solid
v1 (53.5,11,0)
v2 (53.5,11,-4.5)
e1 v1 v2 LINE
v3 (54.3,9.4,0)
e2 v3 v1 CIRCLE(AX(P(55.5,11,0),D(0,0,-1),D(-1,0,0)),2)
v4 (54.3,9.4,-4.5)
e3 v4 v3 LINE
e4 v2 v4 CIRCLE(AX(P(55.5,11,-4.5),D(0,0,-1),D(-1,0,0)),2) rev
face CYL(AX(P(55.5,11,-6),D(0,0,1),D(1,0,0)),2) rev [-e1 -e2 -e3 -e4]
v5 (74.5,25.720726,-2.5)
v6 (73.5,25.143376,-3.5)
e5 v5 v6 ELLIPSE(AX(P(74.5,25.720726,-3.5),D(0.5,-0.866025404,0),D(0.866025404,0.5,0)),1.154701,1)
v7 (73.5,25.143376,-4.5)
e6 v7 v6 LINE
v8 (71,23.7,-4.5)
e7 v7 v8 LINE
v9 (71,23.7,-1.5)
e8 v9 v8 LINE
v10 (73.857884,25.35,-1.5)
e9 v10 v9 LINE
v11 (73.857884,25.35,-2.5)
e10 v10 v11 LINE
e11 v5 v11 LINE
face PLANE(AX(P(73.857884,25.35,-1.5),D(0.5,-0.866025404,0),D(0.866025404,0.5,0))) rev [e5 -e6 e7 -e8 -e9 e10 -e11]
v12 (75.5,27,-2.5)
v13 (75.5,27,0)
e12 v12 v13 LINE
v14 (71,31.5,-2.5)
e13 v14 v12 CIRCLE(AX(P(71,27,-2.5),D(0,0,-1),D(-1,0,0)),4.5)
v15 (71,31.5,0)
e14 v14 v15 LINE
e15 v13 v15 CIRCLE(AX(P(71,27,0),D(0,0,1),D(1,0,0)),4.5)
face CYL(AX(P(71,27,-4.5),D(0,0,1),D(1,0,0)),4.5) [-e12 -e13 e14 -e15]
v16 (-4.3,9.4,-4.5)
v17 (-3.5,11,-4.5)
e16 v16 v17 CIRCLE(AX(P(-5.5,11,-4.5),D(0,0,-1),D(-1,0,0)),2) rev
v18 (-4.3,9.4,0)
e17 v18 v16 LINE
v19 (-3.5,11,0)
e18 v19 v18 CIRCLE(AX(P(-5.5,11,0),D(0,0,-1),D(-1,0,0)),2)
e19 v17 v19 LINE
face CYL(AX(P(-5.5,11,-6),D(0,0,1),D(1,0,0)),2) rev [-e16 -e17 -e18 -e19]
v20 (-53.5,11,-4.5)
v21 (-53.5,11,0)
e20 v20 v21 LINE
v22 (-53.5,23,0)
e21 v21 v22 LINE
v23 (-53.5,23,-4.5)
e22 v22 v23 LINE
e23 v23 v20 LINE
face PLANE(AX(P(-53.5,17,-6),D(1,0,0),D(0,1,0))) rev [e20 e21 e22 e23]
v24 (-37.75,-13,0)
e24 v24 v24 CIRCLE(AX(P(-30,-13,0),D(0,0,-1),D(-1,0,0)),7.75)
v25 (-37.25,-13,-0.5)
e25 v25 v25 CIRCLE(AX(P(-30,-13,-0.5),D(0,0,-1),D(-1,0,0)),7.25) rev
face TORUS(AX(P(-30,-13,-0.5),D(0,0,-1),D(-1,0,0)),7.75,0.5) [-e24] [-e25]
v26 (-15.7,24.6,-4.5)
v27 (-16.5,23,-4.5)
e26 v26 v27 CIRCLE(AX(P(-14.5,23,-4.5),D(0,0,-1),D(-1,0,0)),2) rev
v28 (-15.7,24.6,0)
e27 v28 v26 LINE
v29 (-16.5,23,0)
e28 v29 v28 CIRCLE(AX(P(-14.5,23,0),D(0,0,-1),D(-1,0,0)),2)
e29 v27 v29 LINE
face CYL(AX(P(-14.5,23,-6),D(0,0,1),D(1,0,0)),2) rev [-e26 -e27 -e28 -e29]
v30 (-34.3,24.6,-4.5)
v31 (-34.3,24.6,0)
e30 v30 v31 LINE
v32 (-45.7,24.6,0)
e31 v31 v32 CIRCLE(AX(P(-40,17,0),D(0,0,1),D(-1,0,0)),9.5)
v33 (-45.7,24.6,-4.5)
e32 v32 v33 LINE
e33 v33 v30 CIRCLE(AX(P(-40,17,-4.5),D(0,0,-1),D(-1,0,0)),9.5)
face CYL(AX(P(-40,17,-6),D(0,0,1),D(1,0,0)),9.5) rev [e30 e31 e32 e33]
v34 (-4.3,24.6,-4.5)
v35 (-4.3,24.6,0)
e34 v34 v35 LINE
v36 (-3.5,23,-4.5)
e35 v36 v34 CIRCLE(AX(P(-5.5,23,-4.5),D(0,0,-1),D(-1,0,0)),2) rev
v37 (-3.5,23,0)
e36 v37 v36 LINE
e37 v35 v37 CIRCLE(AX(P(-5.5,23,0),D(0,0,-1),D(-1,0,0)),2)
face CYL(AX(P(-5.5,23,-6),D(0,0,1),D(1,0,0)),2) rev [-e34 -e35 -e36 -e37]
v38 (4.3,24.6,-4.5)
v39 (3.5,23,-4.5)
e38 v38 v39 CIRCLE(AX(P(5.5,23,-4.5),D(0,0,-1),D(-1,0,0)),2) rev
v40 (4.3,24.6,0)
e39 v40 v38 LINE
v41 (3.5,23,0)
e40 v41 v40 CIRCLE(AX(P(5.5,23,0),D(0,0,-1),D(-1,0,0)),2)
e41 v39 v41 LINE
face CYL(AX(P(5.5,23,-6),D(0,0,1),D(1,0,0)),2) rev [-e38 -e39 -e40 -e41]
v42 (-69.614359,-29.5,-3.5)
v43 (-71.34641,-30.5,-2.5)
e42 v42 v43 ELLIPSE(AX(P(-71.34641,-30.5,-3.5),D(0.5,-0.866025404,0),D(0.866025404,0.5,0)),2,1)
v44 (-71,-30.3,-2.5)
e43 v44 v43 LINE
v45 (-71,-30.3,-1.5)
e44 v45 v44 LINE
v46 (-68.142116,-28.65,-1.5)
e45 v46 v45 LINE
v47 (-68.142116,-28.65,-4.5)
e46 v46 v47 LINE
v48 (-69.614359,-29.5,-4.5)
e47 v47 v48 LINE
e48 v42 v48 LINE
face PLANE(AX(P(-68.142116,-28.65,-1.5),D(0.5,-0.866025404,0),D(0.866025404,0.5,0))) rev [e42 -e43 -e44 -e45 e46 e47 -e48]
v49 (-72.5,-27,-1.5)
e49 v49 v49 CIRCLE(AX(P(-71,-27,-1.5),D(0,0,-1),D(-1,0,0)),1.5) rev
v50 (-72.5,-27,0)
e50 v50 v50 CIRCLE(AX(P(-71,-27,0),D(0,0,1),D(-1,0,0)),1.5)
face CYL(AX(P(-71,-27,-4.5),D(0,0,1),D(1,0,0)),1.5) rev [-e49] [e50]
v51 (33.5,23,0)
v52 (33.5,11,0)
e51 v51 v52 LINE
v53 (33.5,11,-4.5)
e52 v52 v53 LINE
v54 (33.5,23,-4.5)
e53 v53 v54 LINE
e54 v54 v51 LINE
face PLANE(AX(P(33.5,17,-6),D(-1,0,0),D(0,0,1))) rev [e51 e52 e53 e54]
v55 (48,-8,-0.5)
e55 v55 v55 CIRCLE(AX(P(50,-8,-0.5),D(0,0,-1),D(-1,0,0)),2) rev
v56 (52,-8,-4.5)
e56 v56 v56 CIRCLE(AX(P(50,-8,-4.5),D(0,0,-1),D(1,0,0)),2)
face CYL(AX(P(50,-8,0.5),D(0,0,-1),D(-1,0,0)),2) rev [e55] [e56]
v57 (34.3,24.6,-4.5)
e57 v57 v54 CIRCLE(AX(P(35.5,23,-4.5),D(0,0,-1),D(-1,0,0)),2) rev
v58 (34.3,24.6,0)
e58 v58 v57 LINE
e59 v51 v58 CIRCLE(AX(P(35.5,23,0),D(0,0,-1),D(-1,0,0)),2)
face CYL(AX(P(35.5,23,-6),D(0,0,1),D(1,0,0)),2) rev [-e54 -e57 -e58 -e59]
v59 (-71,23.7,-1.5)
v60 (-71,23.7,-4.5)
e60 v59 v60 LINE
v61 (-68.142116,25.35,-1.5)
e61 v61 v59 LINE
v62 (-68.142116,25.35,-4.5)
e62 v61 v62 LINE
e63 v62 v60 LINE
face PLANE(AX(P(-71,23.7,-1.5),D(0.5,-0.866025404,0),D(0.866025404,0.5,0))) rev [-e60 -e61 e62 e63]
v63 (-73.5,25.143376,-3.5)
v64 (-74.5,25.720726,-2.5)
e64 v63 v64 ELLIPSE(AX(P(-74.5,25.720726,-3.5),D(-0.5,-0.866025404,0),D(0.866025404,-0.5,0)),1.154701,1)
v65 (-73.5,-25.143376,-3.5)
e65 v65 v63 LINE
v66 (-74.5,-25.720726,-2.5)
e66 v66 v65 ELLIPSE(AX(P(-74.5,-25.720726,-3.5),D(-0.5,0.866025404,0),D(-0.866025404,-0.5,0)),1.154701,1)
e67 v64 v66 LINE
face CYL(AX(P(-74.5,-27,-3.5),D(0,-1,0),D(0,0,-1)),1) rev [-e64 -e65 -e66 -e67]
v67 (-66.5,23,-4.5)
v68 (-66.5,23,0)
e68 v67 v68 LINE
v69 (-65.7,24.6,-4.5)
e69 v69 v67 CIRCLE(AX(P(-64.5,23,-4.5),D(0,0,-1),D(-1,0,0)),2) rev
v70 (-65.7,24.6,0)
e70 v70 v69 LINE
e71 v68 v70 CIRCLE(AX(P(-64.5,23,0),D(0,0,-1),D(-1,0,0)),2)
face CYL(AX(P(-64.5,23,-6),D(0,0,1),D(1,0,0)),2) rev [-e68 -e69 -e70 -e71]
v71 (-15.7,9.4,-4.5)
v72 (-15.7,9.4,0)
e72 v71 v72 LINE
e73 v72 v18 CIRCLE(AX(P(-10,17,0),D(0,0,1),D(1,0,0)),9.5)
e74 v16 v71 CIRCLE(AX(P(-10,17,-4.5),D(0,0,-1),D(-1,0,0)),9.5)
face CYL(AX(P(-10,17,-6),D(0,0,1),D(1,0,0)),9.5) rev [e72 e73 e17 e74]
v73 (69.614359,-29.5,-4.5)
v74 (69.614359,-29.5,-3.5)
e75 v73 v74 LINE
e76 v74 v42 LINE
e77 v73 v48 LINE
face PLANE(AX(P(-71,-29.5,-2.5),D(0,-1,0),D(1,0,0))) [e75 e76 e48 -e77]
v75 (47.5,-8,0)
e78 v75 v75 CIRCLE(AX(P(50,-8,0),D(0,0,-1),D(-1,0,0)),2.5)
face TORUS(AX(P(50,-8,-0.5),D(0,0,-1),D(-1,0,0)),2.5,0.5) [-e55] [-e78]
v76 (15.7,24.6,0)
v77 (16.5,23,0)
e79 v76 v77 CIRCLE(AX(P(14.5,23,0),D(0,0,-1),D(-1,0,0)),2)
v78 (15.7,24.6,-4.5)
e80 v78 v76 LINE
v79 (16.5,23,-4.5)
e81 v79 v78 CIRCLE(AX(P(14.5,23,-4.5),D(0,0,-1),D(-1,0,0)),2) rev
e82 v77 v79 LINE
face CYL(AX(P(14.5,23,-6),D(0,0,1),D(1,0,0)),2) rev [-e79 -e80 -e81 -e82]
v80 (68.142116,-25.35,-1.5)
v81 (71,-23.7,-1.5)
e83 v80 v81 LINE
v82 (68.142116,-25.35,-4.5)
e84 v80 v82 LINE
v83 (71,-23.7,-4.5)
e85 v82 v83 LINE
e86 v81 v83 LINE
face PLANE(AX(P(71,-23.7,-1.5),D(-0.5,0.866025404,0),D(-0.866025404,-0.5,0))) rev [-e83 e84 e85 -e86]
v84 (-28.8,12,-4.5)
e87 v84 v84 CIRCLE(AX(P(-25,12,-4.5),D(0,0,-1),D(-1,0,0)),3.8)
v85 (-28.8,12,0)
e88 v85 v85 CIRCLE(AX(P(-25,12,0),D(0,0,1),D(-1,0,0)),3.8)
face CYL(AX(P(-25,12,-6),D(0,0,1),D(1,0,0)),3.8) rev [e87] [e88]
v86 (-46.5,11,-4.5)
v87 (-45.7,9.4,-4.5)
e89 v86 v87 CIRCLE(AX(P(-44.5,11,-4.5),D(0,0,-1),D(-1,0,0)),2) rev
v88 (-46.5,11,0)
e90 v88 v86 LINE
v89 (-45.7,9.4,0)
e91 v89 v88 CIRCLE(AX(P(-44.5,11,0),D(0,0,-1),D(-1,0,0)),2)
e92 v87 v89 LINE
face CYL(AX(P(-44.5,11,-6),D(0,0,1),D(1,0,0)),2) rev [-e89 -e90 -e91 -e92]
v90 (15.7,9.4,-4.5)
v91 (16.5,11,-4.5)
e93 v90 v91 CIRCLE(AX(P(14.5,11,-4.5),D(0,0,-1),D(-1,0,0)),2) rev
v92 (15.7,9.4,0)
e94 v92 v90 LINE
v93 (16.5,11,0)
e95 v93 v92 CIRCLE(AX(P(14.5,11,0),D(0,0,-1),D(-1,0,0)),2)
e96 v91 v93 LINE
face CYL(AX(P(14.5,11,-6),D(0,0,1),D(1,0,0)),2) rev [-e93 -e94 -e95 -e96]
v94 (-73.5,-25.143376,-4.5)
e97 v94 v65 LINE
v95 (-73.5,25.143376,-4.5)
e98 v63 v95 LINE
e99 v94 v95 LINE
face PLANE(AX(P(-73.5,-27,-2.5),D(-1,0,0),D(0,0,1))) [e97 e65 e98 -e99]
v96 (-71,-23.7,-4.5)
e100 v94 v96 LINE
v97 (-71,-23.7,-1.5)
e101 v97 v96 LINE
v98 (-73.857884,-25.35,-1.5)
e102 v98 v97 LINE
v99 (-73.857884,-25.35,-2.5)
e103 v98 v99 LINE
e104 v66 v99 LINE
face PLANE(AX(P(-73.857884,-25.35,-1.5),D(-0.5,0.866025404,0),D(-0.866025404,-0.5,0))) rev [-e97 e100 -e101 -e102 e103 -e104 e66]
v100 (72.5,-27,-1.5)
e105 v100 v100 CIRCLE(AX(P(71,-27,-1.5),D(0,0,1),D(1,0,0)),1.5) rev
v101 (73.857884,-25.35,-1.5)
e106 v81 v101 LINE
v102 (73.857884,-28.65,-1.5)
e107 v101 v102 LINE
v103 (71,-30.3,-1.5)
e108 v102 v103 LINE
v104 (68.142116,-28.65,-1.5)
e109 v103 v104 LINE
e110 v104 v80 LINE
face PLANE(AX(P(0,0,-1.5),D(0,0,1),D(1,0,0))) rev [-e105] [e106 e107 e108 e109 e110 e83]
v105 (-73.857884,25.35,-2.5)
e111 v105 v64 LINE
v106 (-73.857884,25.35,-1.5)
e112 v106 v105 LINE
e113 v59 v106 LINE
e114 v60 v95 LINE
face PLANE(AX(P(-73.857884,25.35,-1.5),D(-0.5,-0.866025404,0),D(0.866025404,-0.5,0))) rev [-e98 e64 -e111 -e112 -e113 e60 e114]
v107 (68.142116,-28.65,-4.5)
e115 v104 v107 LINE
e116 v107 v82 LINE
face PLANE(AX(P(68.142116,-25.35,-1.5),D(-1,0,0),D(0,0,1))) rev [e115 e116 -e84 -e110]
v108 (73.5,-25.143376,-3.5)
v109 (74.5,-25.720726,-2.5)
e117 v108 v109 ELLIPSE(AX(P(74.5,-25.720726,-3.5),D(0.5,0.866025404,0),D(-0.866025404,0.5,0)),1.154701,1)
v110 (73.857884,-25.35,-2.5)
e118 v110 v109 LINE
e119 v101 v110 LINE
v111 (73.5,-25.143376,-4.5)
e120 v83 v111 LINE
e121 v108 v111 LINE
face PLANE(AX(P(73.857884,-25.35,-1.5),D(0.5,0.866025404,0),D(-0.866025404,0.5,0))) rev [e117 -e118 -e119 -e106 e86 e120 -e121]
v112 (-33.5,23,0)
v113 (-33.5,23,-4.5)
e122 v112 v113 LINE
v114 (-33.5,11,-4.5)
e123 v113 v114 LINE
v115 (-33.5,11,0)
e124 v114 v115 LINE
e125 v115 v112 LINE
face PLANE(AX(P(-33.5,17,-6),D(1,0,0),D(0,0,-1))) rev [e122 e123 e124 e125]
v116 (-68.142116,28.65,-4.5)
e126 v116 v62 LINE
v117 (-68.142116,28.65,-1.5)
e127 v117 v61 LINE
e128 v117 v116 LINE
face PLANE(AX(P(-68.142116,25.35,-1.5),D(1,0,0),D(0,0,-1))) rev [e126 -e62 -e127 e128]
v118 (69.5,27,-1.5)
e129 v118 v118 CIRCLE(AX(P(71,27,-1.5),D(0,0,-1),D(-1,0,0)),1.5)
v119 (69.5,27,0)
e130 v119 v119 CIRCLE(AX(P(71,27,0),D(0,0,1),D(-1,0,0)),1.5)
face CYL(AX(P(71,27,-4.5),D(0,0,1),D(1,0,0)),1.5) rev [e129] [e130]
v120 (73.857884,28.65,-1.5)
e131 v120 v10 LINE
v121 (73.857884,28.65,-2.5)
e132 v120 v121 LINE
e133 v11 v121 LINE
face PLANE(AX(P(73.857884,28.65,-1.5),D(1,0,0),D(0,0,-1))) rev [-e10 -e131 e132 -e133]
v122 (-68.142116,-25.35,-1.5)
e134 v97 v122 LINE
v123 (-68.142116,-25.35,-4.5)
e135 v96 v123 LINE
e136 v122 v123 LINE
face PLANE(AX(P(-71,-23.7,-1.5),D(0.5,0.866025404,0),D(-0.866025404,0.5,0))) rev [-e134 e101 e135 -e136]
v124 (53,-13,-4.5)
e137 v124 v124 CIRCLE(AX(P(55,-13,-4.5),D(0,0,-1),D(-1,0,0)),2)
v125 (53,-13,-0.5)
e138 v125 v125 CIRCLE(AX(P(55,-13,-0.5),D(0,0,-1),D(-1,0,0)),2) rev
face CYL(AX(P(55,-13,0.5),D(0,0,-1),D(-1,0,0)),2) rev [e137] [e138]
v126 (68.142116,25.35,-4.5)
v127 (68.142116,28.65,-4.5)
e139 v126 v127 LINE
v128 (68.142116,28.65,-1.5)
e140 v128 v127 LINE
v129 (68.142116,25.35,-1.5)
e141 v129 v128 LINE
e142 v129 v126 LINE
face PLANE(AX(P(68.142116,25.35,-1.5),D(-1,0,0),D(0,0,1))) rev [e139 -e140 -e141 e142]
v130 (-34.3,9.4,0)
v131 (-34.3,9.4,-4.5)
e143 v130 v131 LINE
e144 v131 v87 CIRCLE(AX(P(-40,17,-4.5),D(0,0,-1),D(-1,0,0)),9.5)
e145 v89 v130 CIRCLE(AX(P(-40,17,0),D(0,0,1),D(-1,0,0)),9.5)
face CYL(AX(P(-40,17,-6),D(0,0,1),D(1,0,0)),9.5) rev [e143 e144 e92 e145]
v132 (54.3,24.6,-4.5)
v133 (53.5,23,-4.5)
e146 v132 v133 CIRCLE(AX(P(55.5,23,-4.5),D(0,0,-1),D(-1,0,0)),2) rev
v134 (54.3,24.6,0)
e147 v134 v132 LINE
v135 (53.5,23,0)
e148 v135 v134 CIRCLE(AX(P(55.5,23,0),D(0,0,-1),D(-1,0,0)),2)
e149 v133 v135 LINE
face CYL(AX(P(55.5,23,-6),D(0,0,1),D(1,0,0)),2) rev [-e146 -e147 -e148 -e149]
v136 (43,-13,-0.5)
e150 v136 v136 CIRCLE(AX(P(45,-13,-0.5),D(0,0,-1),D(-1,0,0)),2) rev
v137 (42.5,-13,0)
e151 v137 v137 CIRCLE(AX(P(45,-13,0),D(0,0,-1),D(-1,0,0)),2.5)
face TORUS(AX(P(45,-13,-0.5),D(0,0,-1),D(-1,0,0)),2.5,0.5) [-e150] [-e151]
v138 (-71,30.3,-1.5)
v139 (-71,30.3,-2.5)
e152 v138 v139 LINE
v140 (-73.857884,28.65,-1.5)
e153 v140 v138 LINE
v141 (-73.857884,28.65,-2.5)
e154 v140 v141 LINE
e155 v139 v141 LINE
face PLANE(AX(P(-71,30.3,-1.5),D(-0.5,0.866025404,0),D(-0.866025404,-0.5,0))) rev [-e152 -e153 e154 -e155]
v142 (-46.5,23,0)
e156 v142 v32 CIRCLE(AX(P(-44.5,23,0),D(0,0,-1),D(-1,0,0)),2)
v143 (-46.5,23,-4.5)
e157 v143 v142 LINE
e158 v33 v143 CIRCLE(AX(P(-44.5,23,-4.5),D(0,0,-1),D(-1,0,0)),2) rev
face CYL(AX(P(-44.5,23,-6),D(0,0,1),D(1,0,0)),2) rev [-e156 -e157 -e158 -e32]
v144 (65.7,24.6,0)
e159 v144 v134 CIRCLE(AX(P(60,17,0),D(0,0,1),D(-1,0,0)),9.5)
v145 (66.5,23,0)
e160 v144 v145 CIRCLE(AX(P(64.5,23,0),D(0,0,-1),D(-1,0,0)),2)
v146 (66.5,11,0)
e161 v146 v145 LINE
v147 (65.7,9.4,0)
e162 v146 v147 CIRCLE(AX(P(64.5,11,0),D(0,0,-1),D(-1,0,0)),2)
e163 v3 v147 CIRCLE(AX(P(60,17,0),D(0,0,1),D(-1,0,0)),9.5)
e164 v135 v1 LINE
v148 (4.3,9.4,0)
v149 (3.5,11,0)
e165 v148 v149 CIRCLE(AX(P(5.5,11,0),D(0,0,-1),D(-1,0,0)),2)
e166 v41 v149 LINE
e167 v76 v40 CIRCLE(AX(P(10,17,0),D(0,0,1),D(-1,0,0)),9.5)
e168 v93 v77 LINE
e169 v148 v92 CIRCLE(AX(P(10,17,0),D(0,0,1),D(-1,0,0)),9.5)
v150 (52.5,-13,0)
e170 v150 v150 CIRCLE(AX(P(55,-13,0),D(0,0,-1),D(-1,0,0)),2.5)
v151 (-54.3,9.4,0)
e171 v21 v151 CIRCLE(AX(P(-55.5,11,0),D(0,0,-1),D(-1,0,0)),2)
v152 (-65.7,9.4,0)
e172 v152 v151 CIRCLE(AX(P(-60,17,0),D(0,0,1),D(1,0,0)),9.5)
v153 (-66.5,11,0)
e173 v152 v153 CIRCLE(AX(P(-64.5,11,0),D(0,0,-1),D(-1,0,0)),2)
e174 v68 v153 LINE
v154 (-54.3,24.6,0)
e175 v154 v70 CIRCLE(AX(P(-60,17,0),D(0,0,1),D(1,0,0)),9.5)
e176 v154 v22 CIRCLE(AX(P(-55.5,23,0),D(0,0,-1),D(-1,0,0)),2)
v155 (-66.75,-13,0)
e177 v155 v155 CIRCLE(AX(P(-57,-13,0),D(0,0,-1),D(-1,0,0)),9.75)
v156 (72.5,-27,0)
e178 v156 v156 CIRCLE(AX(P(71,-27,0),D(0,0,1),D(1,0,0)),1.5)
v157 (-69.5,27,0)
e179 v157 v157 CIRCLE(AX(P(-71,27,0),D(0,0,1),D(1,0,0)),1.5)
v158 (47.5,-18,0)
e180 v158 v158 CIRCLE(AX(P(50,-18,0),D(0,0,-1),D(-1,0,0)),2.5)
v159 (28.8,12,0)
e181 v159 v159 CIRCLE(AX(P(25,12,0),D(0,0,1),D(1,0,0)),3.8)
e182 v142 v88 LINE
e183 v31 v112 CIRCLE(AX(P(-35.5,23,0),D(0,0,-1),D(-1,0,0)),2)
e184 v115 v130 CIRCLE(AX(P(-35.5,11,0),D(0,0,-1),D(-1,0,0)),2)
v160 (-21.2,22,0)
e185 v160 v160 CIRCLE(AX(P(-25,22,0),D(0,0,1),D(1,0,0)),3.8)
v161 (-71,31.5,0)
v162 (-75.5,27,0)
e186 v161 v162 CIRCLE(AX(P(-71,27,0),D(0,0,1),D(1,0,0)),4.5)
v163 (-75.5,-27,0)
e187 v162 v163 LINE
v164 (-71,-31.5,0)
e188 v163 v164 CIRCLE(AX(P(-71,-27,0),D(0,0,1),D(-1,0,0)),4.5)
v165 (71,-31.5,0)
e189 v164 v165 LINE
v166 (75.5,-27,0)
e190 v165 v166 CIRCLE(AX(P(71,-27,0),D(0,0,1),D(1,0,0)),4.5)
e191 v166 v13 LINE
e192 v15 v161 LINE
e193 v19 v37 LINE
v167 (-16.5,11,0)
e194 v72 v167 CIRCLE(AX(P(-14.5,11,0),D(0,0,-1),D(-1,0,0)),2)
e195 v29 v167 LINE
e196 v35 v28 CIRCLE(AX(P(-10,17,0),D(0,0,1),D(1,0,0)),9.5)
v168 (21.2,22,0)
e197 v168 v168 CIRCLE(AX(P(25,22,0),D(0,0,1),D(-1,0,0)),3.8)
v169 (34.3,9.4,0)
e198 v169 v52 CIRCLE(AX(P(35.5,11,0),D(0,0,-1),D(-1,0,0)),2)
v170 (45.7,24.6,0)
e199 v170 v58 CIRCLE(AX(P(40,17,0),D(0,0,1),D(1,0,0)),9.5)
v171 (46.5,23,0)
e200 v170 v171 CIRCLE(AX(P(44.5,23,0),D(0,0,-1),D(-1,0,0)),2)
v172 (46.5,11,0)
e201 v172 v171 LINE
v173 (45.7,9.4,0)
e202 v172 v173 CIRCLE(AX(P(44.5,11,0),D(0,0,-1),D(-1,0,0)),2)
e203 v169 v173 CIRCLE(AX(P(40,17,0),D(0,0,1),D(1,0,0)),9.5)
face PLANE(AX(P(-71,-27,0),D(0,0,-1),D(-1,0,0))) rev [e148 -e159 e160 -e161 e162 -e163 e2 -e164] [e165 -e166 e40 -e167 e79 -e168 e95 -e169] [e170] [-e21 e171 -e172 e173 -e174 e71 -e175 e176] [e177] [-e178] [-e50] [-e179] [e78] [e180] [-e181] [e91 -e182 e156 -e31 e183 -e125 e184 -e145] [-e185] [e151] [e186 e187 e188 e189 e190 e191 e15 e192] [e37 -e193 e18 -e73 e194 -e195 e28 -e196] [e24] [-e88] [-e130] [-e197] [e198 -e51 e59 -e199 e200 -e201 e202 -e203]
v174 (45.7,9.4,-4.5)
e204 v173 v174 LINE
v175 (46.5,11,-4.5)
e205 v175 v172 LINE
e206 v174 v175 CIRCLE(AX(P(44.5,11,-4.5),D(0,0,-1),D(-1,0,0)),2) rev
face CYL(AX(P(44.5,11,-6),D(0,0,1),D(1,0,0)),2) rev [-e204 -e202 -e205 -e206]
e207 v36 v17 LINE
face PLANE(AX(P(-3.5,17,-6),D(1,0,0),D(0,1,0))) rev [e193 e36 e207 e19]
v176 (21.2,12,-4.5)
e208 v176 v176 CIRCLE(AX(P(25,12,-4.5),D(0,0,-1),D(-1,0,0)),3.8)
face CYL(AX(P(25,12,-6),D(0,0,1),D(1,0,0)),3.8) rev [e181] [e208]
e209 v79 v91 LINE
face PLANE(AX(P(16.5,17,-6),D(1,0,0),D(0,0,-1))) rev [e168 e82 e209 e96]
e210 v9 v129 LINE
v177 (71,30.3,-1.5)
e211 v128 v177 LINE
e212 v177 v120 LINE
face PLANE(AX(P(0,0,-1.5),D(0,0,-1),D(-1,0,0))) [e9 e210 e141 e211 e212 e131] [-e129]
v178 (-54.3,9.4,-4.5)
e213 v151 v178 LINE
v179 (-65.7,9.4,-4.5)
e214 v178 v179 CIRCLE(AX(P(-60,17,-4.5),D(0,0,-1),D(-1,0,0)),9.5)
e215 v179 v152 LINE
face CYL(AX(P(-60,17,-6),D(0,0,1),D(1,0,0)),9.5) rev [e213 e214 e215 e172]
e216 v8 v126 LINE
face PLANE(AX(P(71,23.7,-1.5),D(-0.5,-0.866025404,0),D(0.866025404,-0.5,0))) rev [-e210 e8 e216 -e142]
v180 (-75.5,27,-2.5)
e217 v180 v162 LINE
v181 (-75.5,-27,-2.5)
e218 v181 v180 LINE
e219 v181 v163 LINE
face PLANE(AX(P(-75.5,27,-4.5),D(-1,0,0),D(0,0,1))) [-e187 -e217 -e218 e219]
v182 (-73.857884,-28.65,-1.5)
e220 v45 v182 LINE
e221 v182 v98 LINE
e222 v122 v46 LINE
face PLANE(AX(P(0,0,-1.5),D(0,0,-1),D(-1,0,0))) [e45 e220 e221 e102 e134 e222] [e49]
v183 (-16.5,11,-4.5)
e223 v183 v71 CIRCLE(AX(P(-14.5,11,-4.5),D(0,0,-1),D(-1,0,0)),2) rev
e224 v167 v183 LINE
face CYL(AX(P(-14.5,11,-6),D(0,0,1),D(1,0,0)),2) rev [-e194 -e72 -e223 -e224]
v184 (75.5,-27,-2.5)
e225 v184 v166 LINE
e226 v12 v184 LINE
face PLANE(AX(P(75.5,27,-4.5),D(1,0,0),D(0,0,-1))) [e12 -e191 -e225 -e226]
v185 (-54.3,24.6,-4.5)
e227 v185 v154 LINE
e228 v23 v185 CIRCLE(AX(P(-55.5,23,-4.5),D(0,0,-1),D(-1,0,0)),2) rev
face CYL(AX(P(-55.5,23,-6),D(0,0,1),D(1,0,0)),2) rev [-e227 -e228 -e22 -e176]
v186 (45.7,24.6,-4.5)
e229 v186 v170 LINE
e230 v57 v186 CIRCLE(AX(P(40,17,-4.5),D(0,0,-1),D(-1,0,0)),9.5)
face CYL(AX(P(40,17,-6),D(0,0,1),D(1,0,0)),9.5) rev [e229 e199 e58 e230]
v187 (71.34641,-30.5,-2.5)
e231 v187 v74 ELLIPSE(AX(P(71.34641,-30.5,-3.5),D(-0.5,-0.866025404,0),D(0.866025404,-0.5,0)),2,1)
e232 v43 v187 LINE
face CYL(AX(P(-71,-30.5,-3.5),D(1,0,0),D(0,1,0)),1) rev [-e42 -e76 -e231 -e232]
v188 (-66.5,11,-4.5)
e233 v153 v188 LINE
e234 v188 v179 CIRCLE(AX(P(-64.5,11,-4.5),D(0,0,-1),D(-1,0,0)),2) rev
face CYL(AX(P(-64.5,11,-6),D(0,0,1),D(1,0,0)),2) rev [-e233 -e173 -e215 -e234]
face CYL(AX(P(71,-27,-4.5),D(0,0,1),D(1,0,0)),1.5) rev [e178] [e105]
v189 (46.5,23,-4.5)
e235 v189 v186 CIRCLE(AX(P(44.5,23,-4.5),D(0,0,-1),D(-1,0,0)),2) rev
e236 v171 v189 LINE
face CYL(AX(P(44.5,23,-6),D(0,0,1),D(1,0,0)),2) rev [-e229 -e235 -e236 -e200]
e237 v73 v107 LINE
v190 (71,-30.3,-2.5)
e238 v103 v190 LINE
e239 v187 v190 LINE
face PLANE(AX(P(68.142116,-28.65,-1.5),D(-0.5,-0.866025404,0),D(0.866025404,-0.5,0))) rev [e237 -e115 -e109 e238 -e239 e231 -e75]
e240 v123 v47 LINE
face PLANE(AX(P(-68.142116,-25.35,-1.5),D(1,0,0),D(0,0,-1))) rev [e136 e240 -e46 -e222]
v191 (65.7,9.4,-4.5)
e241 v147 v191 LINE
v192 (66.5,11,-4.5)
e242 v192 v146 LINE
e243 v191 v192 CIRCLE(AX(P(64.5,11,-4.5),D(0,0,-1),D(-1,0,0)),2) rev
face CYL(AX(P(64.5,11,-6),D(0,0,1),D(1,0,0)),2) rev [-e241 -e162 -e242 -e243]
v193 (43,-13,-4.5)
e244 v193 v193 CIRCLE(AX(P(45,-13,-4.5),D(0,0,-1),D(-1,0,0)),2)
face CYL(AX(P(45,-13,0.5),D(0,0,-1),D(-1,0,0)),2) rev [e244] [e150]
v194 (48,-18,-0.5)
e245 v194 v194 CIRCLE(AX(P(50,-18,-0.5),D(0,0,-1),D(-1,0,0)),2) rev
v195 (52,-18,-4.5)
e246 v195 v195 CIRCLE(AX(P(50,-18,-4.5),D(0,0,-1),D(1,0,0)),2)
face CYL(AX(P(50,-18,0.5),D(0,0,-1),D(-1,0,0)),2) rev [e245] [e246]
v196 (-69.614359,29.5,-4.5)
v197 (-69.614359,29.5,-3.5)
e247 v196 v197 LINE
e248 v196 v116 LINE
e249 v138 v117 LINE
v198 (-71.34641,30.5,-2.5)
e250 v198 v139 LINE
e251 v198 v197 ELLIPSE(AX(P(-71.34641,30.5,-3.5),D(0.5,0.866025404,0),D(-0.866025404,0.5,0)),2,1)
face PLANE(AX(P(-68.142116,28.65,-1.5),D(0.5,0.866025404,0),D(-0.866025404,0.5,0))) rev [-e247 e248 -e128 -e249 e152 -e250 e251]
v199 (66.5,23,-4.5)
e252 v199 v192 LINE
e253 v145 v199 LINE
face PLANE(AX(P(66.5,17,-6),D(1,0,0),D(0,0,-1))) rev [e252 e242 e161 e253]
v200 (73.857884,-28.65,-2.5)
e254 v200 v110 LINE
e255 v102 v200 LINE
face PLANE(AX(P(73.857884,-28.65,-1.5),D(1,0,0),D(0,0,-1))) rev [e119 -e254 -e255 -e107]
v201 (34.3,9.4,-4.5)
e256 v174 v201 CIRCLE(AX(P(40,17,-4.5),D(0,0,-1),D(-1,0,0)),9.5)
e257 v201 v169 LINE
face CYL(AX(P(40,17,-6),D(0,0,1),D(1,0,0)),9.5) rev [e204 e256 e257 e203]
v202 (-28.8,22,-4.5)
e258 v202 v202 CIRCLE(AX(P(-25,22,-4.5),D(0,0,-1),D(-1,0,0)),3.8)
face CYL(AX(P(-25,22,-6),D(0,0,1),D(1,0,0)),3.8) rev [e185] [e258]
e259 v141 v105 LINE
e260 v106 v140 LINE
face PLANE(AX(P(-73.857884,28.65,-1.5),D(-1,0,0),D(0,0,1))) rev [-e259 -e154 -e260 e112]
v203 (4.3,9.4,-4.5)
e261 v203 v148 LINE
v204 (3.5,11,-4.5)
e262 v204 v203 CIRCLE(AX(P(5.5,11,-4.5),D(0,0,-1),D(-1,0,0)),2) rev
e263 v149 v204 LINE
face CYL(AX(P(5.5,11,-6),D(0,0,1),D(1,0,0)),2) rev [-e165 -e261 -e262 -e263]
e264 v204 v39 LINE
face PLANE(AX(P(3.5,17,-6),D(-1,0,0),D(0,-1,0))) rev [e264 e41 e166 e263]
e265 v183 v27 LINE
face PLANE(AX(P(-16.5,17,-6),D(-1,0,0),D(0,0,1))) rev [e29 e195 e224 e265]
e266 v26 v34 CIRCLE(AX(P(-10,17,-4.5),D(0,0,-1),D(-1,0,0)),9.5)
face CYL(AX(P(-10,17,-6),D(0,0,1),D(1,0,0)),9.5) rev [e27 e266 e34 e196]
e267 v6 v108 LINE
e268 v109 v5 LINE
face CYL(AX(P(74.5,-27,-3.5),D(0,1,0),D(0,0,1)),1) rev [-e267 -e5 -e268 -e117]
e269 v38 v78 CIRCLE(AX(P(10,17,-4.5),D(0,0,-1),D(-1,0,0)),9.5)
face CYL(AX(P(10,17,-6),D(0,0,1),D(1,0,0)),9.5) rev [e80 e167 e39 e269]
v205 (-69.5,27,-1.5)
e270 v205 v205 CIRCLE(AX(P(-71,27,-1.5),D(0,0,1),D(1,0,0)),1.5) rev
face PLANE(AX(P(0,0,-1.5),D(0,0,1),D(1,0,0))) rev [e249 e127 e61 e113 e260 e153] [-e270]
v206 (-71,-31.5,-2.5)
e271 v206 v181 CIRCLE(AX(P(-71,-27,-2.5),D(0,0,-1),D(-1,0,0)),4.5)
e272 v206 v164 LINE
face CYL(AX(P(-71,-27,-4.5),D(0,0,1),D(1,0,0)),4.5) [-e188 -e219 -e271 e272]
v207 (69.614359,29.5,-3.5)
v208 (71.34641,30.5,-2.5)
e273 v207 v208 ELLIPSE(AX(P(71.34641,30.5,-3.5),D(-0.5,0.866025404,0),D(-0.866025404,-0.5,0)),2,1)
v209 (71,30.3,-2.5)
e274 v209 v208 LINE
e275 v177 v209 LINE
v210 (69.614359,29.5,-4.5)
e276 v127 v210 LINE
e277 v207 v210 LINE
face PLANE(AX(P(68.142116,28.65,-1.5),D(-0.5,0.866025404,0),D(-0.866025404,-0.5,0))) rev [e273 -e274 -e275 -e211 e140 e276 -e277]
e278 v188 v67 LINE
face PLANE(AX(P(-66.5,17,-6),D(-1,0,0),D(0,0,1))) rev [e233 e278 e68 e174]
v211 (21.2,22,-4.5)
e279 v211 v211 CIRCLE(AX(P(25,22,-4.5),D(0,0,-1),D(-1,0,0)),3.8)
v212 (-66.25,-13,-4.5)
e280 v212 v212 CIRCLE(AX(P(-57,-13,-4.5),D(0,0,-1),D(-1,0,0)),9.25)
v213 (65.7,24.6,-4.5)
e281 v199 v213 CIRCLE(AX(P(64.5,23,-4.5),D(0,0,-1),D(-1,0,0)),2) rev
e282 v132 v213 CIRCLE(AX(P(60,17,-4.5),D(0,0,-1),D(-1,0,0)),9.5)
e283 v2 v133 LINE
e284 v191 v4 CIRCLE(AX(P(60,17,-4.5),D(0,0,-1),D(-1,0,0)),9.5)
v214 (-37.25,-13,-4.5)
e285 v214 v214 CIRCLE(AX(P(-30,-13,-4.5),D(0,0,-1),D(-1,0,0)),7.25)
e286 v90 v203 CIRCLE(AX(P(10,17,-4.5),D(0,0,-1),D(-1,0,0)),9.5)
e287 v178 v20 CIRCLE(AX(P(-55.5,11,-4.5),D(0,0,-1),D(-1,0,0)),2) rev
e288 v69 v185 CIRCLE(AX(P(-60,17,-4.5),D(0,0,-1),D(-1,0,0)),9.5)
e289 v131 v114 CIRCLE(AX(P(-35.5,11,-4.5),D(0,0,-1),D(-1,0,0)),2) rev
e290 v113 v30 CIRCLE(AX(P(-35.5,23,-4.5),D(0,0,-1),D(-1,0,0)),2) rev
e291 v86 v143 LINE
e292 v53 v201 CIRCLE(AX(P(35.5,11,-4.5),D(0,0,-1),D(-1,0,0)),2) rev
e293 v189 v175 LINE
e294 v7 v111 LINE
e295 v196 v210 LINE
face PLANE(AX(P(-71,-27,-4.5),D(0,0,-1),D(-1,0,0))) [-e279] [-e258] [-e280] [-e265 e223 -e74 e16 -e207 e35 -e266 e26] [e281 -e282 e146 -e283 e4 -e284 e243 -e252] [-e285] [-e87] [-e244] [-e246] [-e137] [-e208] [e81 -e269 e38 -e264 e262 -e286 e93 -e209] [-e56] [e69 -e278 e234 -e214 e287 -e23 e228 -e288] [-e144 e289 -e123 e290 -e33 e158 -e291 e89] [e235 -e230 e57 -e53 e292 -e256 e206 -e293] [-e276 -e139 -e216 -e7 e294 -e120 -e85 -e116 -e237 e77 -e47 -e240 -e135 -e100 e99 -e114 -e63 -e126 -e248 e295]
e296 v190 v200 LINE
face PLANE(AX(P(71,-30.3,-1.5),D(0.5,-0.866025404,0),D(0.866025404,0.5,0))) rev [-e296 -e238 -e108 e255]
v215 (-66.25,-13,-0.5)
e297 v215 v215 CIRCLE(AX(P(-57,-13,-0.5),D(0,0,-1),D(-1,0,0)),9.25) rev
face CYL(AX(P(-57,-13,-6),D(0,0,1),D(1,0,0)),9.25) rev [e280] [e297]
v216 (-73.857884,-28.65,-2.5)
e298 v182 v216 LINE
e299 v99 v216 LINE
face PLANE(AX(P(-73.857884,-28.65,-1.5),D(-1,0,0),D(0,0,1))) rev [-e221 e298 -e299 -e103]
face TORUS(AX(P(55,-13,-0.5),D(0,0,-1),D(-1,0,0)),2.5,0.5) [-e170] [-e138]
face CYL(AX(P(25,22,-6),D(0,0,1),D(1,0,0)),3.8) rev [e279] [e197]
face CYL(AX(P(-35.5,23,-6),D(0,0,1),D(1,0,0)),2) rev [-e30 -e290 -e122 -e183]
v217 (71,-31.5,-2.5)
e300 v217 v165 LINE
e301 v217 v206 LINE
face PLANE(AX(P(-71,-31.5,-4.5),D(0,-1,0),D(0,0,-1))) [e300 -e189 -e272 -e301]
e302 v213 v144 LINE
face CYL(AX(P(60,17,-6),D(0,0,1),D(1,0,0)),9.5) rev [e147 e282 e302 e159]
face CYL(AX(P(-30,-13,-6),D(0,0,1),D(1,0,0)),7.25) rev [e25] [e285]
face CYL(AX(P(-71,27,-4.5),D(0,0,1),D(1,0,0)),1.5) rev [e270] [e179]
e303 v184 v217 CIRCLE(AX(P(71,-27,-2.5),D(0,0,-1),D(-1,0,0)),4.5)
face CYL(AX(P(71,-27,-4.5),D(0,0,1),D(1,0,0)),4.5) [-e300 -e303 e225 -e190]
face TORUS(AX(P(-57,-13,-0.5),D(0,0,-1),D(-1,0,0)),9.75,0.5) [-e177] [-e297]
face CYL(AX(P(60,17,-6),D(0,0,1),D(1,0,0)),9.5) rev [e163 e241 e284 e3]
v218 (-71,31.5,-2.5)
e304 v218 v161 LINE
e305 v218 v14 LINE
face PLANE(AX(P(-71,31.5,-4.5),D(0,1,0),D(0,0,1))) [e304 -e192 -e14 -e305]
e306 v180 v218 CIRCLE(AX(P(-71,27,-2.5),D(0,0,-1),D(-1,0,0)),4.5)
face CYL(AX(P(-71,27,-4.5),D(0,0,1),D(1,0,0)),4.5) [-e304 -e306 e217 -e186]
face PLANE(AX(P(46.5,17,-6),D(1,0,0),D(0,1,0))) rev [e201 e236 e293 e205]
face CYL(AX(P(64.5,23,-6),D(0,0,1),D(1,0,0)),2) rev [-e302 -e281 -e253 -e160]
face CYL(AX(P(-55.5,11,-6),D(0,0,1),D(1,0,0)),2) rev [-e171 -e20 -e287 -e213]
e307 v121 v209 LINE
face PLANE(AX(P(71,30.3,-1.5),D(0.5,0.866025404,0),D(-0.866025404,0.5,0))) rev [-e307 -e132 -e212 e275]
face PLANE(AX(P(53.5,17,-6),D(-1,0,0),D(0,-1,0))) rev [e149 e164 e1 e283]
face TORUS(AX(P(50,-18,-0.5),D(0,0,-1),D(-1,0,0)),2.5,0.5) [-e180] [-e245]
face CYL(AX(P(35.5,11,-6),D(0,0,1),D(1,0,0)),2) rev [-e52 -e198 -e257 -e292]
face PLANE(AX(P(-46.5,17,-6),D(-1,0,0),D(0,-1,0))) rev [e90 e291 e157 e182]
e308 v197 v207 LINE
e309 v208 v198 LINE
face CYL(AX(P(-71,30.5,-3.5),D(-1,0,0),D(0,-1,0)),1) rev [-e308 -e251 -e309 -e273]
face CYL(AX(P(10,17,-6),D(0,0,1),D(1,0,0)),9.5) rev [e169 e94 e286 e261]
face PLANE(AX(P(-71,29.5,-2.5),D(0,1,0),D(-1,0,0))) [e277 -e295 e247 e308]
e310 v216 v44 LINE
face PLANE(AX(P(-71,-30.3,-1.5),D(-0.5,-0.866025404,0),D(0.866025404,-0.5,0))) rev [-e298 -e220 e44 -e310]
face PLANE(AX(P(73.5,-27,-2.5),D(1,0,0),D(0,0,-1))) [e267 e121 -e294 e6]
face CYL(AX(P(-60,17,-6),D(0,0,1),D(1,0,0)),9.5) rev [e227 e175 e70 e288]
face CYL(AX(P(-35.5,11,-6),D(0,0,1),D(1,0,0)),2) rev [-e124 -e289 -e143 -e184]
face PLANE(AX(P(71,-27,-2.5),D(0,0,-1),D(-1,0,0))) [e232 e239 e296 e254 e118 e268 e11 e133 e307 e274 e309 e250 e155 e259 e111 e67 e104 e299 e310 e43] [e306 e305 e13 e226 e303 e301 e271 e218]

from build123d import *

# Parameters (mm, degrees)
SKETCH_1_R          = 1.5
EXTRUDE_1_DEPTH     = 4.5
CUT_EXTRUDE_START   = -3
SKETCH_2_R          = 1.5
CUT_EXTRUDE_1_DEPTH = 3
SKETCH_3_R          = 3.8
CUT_EXTRUDE_2_DEPTH = 6
SKETCH_4_R          = 9.25
SKETCH_4_R_2        = 7.25
CUT_EXTRUDE_3_DEPTH = 6
SKETCH_5_R          = 2
CUT_EXTRUDE_4_DEPTH = 5
FILLET_1_R          = 2
CUT_EXTRUDE_START_2 = -2
CUT_EXTRUDE_5_DEPTH = 2
FILLET_2_R          = 1
FILLET_3_R          = 0.5
FILLET_4_R          = 0.5


with BuildPart() as part:
    # 草图1 → 凸台-拉伸1 (new body)
    with BuildSketch(Plane.XY):
        with BuildLine():
            Line((-71, 31.5), (71, 31.5))
            ThreePointArc((71, 31.5), (74.181980515, 30.181980515), (75.5, 27))
            Line((75.5, 27), (75.5, -27))
            ThreePointArc((75.5, -27), (74.181980515, -30.181980515), (71, -31.5))
            Line((71, -31.5), (-71, -31.5))
            ThreePointArc((-71, -31.5), (-74.181980515, -30.181980515), (-75.5, -27))
            Line((-75.5, -27), (-75.5, 27))
            ThreePointArc((-75.5, 27), (-74.181980515, 30.181980515), (-71, 31.5))
        make_face()
        with Locations((-71, 27)):
            Circle(SKETCH_1_R, mode=Mode.SUBTRACT)
        with Locations(Location((71, 27, 0), (0, 0, 180))):
            Circle(SKETCH_1_R, mode=Mode.SUBTRACT)
        with Locations((71, -27)):
            Circle(SKETCH_1_R, mode=Mode.SUBTRACT)
        with Locations(Location((-71, -27, 0), (0, 0, 180))):
            Circle(SKETCH_1_R, mode=Mode.SUBTRACT)
    extrude(amount=-EXTRUDE_1_DEPTH)

    # 草图2 → 切除-拉伸1 (cut)
    # profile 1 of 4: a face of its own
    with BuildSketch(Plane(origin=(0, 0, -4.5), x_dir=(-1, 0, 0), z_dir=(0, 0, -1)).offset(CUT_EXTRUDE_START)):
        Polygon((-71, 23.7), (-68.142116168, 25.35), (-68.142116168, 28.65), (-71, 30.3), (-73.857883832, 28.65), (-73.857883832, 25.35), align=None)
        with Locations((-71, 27)):
            Circle(SKETCH_2_R, mode=Mode.SUBTRACT)
    # profile 2 of 4: a face of its own
    with BuildSketch(Plane(origin=(0, 0, -4.5), x_dir=(-1, 0, 0), z_dir=(0, 0, -1)).offset(CUT_EXTRUDE_START)):
        Polygon((71, 30.3), (73.857883832, 28.65), (73.857883832, 25.35), (71, 23.7), (68.142116168, 25.35), (68.142116168, 28.65), align=None)
    # profile 3 of 4: a face of its own
    with BuildSketch(Plane(origin=(0, 0, -4.5), x_dir=(-1, 0, 0), z_dir=(0, 0, -1)).offset(CUT_EXTRUDE_START)):
        Polygon((73.857883832, -28.65), (73.857883832, -25.35), (71, -23.7), (68.142116168, -25.35), (68.142116168, -28.65), (71, -30.3), align=None)
    # profile 4 of 4: a face of its own
    with BuildSketch(Plane(origin=(0, 0, -4.5), x_dir=(-1, 0, 0), z_dir=(0, 0, -1)).offset(CUT_EXTRUDE_START)):
        Polygon((-71, -30.3), (-73.857883832, -28.65), (-73.857883832, -25.35), (-71, -23.7), (-68.142116168, -25.35), (-68.142116168, -28.65), align=None)
    extrude(amount=CUT_EXTRUDE_1_DEPTH, mode=Mode.SUBTRACT)

    # 草图3 → 切除-拉伸2 (cut)
    with BuildSketch(Plane.XY):
        with Locations((-25, 22)):
            Circle(SKETCH_3_R)
        with Locations(Location((-25, 12, 0), (0, 0, 180))):
            Circle(SKETCH_3_R)
        with Locations((25, 12)):
            Circle(SKETCH_3_R)
        with Locations(Location((25, 22, 0), (0, 0, 180))):
            Circle(SKETCH_3_R)
        with BuildLine():
            Line((-53.5, 17), (-53.5, 23.92820323))
            ThreePointArc((-53.5, 23.92820323), (-60, 26.5), (-66.5, 23.92820323))
            Line((-66.5, 23.92820323), (-66.5, 17))
            Line((-66.5, 17), (-66.5, 10.07179677))
            ThreePointArc((-66.5, 10.07179677), (-60, 7.5), (-53.5, 10.07179677))
            Line((-53.5, 10.07179677), (-53.5, 17))
        make_face()
        with BuildLine():
            Line((-33.5, 17), (-33.5, 10.07179677))
            ThreePointArc((-33.5, 10.07179677), (-40, 7.5), (-46.5, 10.07179677))
            Line((-46.5, 10.07179677), (-46.5, 17))
            Line((-46.5, 17), (-46.5, 23.92820323))
            ThreePointArc((-46.5, 23.92820323), (-40, 26.5), (-33.5, 23.92820323))
            Line((-33.5, 23.92820323), (-33.5, 17))
        make_face()
        with BuildLine():
            Line((-3.5, 17), (-3.5, 10.07179677))
            ThreePointArc((-3.5, 10.07179677), (-10, 7.5), (-16.5, 10.07179677))
            Line((-16.5, 10.07179677), (-16.5, 17))
            Line((-16.5, 17), (-16.5, 23.92820323))
            ThreePointArc((-16.5, 23.92820323), (-10, 26.5), (-3.5, 23.92820323))
            Line((-3.5, 23.92820323), (-3.5, 17))
        make_face()
        with BuildLine():
            Line((16.5, 17), (16.5, 10.07179677))
            ThreePointArc((16.5, 10.07179677), (10, 7.5), (3.5, 10.07179677))
            Line((3.5, 10.07179677), (3.5, 17))
            Line((3.5, 17), (3.5, 23.92820323))
            ThreePointArc((3.5, 23.92820323), (10, 26.5), (16.5, 23.92820323))
            Line((16.5, 23.92820323), (16.5, 17))
        make_face()
        with BuildLine():
            Line((46.5, 17), (46.5, 10.07179677))
            ThreePointArc((46.5, 10.07179677), (40, 7.5), (33.5, 10.07179677))
            Line((33.5, 10.07179677), (33.5, 17))
            Line((33.5, 17), (33.5, 23.92820323))
            ThreePointArc((33.5, 23.92820323), (40, 26.5), (46.5, 23.92820323))
            Line((46.5, 23.92820323), (46.5, 17))
        make_face()
        with BuildLine():
            Line((53.5, 17), (53.5, 10.07179677))
            ThreePointArc((53.5, 10.07179677), (60, 7.5), (66.5, 10.07179677))
            Line((66.5, 10.07179677), (66.5, 17))
            Line((66.5, 17), (66.5, 23.92820323))
            ThreePointArc((66.5, 23.92820323), (60, 26.5), (53.5, 23.92820323))
            Line((53.5, 23.92820323), (53.5, 17))
        make_face()
    extrude(amount=-CUT_EXTRUDE_2_DEPTH, mode=Mode.SUBTRACT)

    # 草图4 → 切除-拉伸3 (cut)
    with BuildSketch(Plane.XY):
        with Locations((-57, -13)):
            Circle(SKETCH_4_R)
        with Locations((-30, -13)):
            Circle(SKETCH_4_R_2)
    extrude(amount=-CUT_EXTRUDE_3_DEPTH, mode=Mode.SUBTRACT)

    # 草图5 → 切除-拉伸4 (cut)
    with BuildSketch(Plane(origin=(0, 0, -4.5), x_dir=(-1, 0, 0), z_dir=(0, 0, -1))):
        with Locations((-45, -13)):
            Circle(SKETCH_5_R)
        with Locations((-55, -13)):
            Circle(SKETCH_5_R)
        with Locations((-50, -8)):
            Circle(SKETCH_5_R)
        with Locations((-50, -18)):
            Circle(SKETCH_5_R)
    extrude(amount=-CUT_EXTRUDE_4_DEPTH, mode=Mode.SUBTRACT)

    # 圆角1
    fillet_1_edges = [part.edges().sort_by_distance(p)[0] for p in [
        (-66.5, 23.92820323, -2.25),
        (-53.5, 23.92820323, -2.25),
        (-53.5, 10.07179677, -2.25),
        (-66.5, 10.07179677, -2.25),
        (-33.5, 23.92820323, -2.25),
        (-33.5, 10.07179677, -2.25),
        (-46.5, 10.07179677, -2.25),
        (-46.5, 23.92820323, -2.25),
        (-3.5, 23.92820323, -2.25),
        (-3.5, 10.07179677, -2.25),
        (-16.5, 10.07179677, -2.25),
        (-16.5, 23.92820323, -2.25),
        (16.5, 23.92820323, -2.25),
        (16.5, 10.07179677, -2.25),
        (3.5, 10.07179677, -2.25),
        (3.5, 23.92820323, -2.25),
        (46.5, 23.92820323, -2.25),
        (46.5, 10.07179677, -2.25),
        (33.5, 10.07179677, -2.25),
        (33.5, 23.92820323, -2.25),
        (66.5, 10.07179677, -2.25),
        (53.5, 10.07179677, -2.25),
        (53.5, 23.92820323, -2.25),
        (66.5, 23.92820323, -2.25),
    ]]
    fillet(fillet_1_edges, radius=FILLET_1_R)

    # 草图6 → 切除-拉伸5 (cut)
    with BuildSketch(Plane(origin=(0, 0, -4.5), x_dir=(-1, 0, 0), z_dir=(0, 0, -1)).offset(CUT_EXTRUDE_START_2)):
        with BuildLine():
            Line((-75.5, -27), (-75.5, 27))
            ThreePointArc((-75.5, 27), (-74.181980515, 30.181980515), (-71, 31.5))
            Line((-71, 31.5), (71, 31.5))
            ThreePointArc((71, 31.5), (74.181980515, 30.181980515), (75.5, 27))
            Line((75.5, 27), (75.5, -27))
            ThreePointArc((75.5, -27), (74.181980515, -30.181980515), (71, -31.5))
            Line((71, -31.5), (-71, -31.5))
            ThreePointArc((-71, -31.5), (-74.181980515, -30.181980515), (-75.5, -27))
        make_face()
        with BuildLine():
            Line((71, -29.5), (-71, -29.5))
            ThreePointArc((-71, -29.5), (-72.767766953, -28.767766953), (-73.5, -27))
            Line((-73.5, -27), (-73.5, 27))
            ThreePointArc((-73.5, 27), (-72.767766953, 28.767766953), (-71, 29.5))
            Line((-71, 29.5), (71, 29.5))
            ThreePointArc((71, 29.5), (72.767766953, 28.767766953), (73.5, 27))
            Line((73.5, 27), (73.5, -27))
            ThreePointArc((73.5, -27), (72.767766953, -28.767766953), (71, -29.5))
        make_face(mode=Mode.SUBTRACT)
    extrude(amount=CUT_EXTRUDE_5_DEPTH, mode=Mode.SUBTRACT)

    # 圆角2
    # the kernel refuses this fillet: 1 mm, written as the material it adds along each edge
    with BuildSketch(Plane(origin=(-73.5, 27.643375673, -2.5), x_dir=(-1, 0, 0), z_dir=(0, -1, 0))) as fillet_2_piece_1_section:
        with BuildLine():
            CenterArc((FILLET_2_R, FILLET_2_R), FILLET_2_R, 180, 90)
            Line((0, FILLET_2_R), (0, 0))
            Line((0, 0), (FILLET_2_R, 0))
        make_face()
    fillet_2_piece_1 = extrude(amount=55.286751346, mode=Mode.PRIVATE)
    fillet_2_piece_1 = split(fillet_2_piece_1, bisect_by=Plane(origin=(-62.998675365, 19.080433068, -2.568269358), z_dir=(-0.4999999999999995, -0.866025403784439, 0)), keep=Keep.TOP, mode=Mode.PRIVATE)
    fillet_2_piece_1 = split(fillet_2_piece_1, bisect_by=Plane(origin=(-62.998675365, -19.080433068, -2.568269358), z_dir=(-0.4999999999999995, 0.866025403784439, 0)), keep=Keep.TOP, mode=Mode.PRIVATE)
    add(fillet_2_piece_1)
    with BuildSketch(Plane(origin=(72.114359354, 29.5, -2.5), x_dir=(0, 1, 0), z_dir=(-1, 0, 0))) as fillet_2_piece_2_section:
        with BuildLine():
            CenterArc((FILLET_2_R, FILLET_2_R), FILLET_2_R, 180, 90)
            Line((0, FILLET_2_R), (0, 0))
            Line((0, 0), (FILLET_2_R, 0))
        make_face()
    fillet_2_piece_2 = extrude(amount=144.228718708, mode=Mode.PRIVATE)
    fillet_2_piece_2 = split(fillet_2_piece_2, bisect_by=Plane(origin=(71.034600917, 30.319976849, -2.504027252), z_dir=(-0.4999999999999995, 0.866025403784439, 0)), keep=Keep.TOP, mode=Mode.PRIVATE)
    fillet_2_piece_2 = split(fillet_2_piece_2, bisect_by=Plane(origin=(35.465399084, -31.167826821, -2.504027252), z_dir=(0.4999999999999987, 0.8660254037844395, 0)), keep=Keep.TOP, mode=Mode.PRIVATE)
    add(fillet_2_piece_2)
    with BuildSketch(Plane(origin=(73.5, -27.643375673, -2.5), x_dir=(1, 0, 0), z_dir=(0, 1, 0))) as fillet_2_piece_3_section:
        with BuildLine():
            CenterArc((FILLET_2_R, FILLET_2_R), FILLET_2_R, 180, 90)
            Line((0, FILLET_2_R), (0, 0))
            Line((0, 0), (FILLET_2_R, 0))
        make_face()
    fillet_2_piece_3 = extrude(amount=55.286751346, mode=Mode.PRIVATE)
    fillet_2_piece_3 = split(fillet_2_piece_3, bisect_by=Plane(origin=(62.998675365, -19.080433068, -2.568269358), z_dir=(0.5000000000000013, 0.8660254037844379, 0)), keep=Keep.TOP, mode=Mode.PRIVATE)
    fillet_2_piece_3 = split(fillet_2_piece_3, bisect_by=Plane(origin=(62.998675365, 19.080433068, -2.568269358), z_dir=(0.5000000000000013, -0.8660254037844379, 0)), keep=Keep.TOP, mode=Mode.PRIVATE)
    add(fillet_2_piece_3)
    with BuildSketch(Plane(origin=(-72.114359354, -29.5, -2.5), x_dir=(0, -1, 0), z_dir=(1, 0, 0))) as fillet_2_piece_4_section:
        with BuildLine():
            CenterArc((FILLET_2_R, FILLET_2_R), FILLET_2_R, 180, 90)
            Line((0, FILLET_2_R), (0, 0))
            Line((0, 0), (FILLET_2_R, 0))
        make_face()
    fillet_2_piece_4 = extrude(amount=144.228718708, mode=Mode.PRIVATE)
    fillet_2_piece_4 = split(fillet_2_piece_4, bisect_by=Plane(origin=(-71.034600917, -30.319976849, -2.504027252), z_dir=(0.4999999999999995, -0.866025403784439, 0)), keep=Keep.TOP, mode=Mode.PRIVATE)
    fillet_2_piece_4 = split(fillet_2_piece_4, bisect_by=Plane(origin=(-35.465399084, 31.167826821, -2.504027252), z_dir=(-0.4999999999999995, -0.866025403784439, 0)), keep=Keep.TOP, mode=Mode.PRIVATE)
    add(fillet_2_piece_4)

    # 圆角3
    fillet_3_edges = [part.edges().sort_by_distance(p)[0] for p in [
        (47, -13, 0),
        (57, -13, 0),
        (52, -8, 0),
        (52, -18, 0),
    ]]
    fillet(fillet_3_edges, radius=FILLET_3_R)

    # 圆角4
    fillet_4_edges = [part.edges().sort_by_distance(p)[0] for p in [
        (-37.25, -13, 0),
        (-66.25, -13, 0),
    ]]
    fillet(fillet_4_edges, radius=FILLET_4_R)


solid = part.part
